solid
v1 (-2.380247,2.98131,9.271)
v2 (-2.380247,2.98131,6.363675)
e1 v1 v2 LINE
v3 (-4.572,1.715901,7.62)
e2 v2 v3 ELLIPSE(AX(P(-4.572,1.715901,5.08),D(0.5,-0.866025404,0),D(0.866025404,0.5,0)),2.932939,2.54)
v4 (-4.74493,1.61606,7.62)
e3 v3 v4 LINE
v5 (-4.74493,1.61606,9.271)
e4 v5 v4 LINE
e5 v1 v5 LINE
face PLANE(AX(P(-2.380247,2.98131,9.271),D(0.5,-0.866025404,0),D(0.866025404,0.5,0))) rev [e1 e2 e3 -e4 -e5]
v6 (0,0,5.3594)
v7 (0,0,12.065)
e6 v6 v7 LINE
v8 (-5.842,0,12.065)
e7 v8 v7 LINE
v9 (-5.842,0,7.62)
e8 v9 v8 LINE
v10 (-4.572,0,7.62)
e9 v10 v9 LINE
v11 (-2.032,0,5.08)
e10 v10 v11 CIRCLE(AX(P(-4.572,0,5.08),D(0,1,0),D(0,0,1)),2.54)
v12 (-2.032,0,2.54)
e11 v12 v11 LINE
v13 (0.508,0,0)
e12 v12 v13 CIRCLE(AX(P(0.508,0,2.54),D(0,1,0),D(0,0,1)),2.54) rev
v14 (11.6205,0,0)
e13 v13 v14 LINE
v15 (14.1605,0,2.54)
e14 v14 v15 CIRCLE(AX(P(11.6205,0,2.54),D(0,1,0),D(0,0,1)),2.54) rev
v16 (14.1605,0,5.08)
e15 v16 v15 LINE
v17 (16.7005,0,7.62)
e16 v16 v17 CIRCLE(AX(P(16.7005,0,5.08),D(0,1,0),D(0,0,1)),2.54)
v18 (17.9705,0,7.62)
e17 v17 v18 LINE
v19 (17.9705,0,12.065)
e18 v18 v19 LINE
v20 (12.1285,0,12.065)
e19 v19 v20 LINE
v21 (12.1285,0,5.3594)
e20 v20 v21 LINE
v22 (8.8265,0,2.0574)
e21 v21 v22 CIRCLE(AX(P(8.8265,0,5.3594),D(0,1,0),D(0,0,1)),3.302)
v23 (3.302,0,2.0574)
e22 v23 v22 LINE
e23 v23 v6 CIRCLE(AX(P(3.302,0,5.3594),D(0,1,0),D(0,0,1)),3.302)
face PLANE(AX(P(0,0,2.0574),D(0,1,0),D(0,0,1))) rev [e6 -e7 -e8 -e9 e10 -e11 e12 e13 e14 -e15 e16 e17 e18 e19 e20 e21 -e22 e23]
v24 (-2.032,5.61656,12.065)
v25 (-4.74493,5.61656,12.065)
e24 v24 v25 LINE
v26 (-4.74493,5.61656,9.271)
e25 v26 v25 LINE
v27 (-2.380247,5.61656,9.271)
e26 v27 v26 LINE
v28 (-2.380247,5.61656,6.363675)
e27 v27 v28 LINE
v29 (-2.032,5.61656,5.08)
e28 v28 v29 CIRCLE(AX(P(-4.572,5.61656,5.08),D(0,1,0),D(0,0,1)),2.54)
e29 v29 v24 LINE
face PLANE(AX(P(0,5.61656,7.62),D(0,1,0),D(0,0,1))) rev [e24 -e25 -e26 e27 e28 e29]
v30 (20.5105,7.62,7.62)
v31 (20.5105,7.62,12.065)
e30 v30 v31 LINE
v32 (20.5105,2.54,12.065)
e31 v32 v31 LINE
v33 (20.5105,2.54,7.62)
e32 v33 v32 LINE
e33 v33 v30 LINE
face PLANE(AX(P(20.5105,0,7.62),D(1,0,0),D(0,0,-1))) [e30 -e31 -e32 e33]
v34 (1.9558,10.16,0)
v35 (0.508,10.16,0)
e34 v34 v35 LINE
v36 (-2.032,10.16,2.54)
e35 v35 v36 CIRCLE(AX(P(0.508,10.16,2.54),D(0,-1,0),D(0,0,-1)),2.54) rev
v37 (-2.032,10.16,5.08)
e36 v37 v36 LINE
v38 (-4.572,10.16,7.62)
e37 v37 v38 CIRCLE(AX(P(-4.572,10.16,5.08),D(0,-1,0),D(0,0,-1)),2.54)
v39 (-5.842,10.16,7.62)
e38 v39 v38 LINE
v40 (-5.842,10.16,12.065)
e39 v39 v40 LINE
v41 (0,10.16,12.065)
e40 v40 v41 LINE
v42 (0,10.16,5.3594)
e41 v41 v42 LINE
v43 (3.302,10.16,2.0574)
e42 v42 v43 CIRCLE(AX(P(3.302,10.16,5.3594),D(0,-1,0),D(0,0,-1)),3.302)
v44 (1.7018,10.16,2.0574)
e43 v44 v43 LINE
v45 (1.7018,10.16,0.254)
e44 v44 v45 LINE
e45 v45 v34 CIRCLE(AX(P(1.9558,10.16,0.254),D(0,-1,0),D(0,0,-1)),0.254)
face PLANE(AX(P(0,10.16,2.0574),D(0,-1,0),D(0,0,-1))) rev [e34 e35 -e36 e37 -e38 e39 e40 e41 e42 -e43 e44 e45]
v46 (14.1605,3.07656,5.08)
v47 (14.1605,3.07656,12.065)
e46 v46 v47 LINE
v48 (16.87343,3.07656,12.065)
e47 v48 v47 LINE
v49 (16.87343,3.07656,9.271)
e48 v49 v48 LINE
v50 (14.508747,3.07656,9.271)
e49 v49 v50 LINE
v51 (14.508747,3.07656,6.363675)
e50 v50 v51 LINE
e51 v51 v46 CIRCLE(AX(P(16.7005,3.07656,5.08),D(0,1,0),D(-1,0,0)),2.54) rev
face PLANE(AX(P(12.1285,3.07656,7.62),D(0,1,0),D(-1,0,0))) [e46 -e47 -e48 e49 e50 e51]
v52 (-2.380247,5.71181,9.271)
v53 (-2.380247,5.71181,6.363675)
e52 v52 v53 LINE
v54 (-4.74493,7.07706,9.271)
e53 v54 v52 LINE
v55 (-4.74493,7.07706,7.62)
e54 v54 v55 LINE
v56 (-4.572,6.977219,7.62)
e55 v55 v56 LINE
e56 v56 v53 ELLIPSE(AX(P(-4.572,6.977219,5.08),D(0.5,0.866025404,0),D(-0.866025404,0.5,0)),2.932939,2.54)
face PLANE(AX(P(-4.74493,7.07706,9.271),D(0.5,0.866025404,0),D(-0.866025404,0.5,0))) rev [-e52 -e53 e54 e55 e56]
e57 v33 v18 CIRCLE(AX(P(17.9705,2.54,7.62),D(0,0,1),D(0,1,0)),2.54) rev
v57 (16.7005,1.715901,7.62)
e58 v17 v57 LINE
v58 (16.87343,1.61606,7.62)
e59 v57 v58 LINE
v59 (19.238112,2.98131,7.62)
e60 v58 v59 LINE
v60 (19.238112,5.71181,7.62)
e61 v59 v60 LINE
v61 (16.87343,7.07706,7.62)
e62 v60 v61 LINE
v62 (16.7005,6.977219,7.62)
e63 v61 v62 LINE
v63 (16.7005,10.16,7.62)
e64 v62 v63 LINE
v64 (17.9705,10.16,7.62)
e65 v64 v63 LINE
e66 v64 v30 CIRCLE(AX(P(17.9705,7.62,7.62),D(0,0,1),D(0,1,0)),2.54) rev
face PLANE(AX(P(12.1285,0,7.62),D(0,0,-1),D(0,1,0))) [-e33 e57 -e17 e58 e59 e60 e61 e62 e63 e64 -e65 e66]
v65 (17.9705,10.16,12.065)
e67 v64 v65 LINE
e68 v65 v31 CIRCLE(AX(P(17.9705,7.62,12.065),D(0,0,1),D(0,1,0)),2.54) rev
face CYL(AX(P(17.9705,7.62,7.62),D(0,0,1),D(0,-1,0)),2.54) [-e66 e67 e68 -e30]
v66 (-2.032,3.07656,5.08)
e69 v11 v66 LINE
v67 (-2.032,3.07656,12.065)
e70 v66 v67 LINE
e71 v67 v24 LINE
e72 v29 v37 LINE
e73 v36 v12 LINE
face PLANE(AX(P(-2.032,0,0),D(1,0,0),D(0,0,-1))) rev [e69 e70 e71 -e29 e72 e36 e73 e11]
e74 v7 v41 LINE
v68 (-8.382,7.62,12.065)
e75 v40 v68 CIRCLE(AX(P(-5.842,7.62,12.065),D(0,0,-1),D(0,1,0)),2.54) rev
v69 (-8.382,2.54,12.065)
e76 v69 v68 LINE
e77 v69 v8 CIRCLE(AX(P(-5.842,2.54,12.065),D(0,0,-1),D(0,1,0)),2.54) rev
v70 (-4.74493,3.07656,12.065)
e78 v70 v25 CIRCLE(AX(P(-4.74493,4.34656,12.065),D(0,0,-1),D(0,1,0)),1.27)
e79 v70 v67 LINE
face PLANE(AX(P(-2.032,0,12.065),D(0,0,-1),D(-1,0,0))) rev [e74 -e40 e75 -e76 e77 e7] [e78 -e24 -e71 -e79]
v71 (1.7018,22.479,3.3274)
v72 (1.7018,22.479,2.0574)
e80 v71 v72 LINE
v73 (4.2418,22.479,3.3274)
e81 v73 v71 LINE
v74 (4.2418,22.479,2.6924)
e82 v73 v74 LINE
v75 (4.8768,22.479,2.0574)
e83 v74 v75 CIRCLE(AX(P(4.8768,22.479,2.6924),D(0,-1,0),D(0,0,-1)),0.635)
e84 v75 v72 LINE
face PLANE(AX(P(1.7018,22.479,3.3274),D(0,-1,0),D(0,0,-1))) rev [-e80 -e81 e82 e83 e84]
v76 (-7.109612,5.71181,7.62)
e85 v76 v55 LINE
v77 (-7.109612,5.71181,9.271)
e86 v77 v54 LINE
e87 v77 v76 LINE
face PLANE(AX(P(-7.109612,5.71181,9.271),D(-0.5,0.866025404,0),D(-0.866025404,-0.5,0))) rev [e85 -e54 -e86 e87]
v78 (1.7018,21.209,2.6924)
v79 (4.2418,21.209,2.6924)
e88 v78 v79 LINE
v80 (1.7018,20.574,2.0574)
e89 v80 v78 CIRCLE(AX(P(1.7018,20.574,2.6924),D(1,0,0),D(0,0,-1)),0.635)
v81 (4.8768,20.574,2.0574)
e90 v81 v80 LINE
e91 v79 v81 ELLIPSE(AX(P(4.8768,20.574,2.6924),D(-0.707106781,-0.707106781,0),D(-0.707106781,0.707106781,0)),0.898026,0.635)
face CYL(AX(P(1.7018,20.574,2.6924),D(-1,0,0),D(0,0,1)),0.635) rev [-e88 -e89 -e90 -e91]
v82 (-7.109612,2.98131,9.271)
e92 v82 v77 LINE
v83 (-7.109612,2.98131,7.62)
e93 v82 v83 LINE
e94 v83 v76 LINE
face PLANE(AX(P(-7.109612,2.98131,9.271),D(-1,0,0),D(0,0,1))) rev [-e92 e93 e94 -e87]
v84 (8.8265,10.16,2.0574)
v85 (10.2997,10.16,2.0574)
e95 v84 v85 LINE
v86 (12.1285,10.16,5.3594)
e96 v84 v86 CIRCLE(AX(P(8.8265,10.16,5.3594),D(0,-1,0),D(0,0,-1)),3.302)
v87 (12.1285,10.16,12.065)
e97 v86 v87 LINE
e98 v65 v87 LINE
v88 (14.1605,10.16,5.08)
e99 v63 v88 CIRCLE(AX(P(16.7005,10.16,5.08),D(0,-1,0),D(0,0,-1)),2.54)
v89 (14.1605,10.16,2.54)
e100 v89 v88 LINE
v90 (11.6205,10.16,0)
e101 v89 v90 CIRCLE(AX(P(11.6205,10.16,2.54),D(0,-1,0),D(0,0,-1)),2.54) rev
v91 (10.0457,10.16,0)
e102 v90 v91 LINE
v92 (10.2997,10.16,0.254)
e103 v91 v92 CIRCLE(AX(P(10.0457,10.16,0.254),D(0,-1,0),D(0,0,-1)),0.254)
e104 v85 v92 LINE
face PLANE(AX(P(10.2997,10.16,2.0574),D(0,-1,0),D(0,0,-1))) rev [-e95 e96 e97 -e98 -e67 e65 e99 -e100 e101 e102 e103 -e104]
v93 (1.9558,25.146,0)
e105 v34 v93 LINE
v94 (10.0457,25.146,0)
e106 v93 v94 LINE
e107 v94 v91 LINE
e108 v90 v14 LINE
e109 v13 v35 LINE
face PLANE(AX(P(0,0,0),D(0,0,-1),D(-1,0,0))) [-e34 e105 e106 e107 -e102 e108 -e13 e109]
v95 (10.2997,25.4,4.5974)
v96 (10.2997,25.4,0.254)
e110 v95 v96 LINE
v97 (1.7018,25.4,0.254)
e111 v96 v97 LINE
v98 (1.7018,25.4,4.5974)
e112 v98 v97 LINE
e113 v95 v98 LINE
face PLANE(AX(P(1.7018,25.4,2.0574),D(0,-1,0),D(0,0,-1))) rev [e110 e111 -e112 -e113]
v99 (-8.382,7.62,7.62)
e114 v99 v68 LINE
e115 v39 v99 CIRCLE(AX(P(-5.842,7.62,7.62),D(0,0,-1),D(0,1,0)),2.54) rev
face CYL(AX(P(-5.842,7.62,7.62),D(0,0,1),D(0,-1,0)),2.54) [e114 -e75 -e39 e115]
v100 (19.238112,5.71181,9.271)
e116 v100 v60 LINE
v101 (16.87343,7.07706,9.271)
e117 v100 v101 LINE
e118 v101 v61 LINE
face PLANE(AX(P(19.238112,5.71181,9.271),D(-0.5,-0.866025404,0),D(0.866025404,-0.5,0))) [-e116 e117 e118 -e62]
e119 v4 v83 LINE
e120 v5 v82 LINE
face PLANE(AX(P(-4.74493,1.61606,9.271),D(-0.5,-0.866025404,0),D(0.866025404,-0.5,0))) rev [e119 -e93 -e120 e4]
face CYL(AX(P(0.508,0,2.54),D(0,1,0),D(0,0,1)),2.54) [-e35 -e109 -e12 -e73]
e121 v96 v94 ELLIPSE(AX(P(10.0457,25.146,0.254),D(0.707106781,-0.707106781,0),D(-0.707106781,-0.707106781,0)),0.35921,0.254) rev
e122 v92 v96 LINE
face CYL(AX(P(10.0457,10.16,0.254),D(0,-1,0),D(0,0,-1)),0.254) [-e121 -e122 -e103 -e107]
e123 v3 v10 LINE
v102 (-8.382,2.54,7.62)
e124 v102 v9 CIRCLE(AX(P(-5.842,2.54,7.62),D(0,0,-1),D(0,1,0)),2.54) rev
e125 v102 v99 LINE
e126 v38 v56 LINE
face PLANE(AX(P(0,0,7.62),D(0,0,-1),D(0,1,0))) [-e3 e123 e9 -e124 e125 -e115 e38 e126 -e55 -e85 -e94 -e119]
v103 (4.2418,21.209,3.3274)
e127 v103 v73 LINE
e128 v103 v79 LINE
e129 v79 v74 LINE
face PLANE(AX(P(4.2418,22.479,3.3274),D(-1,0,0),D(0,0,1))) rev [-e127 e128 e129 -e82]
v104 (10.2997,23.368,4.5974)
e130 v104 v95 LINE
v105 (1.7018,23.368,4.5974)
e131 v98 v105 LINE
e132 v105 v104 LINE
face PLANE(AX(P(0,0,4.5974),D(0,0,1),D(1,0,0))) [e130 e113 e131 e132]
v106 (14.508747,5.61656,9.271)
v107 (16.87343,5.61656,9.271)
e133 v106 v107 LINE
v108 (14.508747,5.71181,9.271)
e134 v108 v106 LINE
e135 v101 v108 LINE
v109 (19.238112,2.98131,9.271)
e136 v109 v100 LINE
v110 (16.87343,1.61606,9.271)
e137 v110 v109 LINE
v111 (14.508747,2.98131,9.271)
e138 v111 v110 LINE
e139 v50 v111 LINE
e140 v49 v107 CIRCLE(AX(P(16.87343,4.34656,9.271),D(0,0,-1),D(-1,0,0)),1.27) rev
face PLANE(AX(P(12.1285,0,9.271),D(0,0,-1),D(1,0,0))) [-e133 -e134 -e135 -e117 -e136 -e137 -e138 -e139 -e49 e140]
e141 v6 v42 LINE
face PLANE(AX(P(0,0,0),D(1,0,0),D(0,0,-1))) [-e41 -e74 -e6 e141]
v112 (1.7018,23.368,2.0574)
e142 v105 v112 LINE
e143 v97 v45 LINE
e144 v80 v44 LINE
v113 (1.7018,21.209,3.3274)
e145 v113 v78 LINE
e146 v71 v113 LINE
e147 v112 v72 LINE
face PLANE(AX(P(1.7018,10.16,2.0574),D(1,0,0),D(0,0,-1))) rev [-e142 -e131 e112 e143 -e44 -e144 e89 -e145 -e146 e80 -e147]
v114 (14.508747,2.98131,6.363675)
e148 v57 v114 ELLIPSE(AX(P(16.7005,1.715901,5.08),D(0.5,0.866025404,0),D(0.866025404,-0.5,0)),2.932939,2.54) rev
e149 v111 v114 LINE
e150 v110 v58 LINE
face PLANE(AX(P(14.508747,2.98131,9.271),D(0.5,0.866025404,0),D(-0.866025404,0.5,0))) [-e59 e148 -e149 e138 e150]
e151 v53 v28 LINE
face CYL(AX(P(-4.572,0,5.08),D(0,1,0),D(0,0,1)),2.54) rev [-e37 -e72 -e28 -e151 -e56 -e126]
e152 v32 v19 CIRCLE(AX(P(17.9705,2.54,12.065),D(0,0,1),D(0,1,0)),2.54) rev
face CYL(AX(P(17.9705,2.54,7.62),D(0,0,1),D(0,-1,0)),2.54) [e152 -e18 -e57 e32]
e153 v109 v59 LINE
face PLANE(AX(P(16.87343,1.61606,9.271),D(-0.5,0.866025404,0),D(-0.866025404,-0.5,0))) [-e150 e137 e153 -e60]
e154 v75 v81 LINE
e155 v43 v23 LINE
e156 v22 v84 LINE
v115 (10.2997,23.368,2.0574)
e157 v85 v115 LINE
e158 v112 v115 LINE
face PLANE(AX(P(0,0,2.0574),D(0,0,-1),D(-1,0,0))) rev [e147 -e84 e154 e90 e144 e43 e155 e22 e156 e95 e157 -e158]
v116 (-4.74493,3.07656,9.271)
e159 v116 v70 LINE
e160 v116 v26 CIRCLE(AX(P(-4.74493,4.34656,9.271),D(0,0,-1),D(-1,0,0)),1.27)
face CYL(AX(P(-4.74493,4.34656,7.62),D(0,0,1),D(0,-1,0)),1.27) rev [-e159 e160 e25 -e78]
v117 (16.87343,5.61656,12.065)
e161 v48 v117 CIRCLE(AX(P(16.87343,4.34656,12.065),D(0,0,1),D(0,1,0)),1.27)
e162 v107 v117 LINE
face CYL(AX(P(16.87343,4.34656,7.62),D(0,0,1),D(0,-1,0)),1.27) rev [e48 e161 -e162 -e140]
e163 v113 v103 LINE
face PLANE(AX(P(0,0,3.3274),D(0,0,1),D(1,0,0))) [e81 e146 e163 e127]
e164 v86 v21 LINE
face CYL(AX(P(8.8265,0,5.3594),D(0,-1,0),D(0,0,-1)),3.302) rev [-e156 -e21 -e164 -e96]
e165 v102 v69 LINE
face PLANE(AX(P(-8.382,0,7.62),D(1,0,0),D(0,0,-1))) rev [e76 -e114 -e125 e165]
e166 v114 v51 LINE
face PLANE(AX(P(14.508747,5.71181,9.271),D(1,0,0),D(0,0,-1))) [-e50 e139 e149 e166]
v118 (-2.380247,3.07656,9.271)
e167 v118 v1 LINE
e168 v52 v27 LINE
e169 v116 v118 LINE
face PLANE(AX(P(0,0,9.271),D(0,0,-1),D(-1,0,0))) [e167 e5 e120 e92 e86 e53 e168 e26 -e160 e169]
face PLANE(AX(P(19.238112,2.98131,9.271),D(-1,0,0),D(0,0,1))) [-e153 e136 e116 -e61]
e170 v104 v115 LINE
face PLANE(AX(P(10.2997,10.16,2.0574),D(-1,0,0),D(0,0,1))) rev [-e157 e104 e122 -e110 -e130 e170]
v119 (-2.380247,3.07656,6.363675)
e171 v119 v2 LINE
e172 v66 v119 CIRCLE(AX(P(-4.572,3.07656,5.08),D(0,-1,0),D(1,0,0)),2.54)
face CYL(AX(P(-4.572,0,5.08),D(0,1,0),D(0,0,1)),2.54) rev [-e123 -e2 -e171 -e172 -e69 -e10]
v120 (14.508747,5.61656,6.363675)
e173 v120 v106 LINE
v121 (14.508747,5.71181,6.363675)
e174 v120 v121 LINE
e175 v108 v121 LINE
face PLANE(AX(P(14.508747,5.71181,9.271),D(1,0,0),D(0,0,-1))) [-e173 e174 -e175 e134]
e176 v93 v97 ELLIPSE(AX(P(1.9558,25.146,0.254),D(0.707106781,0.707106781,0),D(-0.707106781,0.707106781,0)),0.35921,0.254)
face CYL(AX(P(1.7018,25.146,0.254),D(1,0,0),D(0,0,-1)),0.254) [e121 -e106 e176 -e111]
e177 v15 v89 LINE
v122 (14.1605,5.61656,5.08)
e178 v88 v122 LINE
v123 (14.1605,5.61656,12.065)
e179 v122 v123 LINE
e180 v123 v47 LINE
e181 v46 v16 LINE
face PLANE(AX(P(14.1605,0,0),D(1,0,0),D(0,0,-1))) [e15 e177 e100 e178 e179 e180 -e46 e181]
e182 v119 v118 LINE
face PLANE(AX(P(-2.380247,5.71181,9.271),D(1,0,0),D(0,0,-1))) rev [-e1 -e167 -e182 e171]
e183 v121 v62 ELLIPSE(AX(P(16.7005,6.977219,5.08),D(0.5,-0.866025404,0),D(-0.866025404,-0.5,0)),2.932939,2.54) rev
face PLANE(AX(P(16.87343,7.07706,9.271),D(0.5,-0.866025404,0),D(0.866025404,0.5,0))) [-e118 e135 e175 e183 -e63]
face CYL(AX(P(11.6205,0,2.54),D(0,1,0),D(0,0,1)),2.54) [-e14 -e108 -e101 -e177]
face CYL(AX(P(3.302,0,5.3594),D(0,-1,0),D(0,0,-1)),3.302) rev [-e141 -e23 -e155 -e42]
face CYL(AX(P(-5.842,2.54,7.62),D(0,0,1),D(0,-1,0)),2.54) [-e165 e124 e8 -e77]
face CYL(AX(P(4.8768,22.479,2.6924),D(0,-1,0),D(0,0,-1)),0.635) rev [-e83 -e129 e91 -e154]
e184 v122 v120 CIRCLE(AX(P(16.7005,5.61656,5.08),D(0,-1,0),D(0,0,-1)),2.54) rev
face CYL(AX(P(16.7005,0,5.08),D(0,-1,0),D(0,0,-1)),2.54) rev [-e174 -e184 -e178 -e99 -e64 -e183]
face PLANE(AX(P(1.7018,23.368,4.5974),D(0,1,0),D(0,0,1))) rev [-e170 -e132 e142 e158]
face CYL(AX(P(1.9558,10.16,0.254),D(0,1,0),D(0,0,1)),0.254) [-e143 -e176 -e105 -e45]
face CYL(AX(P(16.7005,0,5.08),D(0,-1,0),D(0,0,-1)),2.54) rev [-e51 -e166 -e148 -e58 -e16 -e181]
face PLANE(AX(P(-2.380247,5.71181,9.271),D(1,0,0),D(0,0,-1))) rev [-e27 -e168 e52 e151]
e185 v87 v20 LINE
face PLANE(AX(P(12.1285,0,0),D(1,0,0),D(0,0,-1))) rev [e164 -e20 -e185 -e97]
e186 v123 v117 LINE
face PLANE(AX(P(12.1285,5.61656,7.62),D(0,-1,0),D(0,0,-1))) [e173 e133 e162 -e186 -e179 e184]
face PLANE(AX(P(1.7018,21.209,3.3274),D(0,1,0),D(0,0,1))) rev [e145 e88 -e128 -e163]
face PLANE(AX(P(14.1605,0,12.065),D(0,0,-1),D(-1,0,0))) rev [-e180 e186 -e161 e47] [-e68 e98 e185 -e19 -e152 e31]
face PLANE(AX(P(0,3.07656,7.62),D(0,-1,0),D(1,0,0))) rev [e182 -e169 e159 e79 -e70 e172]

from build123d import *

# Parameters (mm, degrees)
BOSS_EXTRUDE1_DEPTH = 2.0574
SKETCH4_W           = 12.065
SKETCH4_H           = 10.16
BOSS_EXTRUDE2_DEPTH = 2.032
SKETCH5_W           = 12.065
SKETCH5_H           = 10.16
BOSS_EXTRUDE3_DEPTH = 2.032
SKETCH8_W           = 8.5979
SKETCH8_H           = 2.032
BOSS_EXTRUDE4_DEPTH = 2.54
FILLET22_R          = 3.302
CUT_EXTRUDE12_DEPTH = 13.208
SKETCH28_W          = 2.54
SKETCH28_H          = 1.27
BOSS_EXTRUDE6_DEPTH = 1.27
BOSS_EXTRUDE7_DEPTH = 4.445
FILLET23_R          = 0.635
CUT_EXTRUDE15_DEPTH = 1.651
FILLET25_R          = 0.254
FILLET26_R          = 2.54


with BuildPart() as part:
    # Sketch1 → Boss-Extrude1 (new body)
    with BuildSketch(Plane.XY):
        Polygon((0, 0), (12.1285, 0), (12.1285, 10.16), (10.2997, 10.16), (10.2997, 25.4), (1.7018, 25.4), (1.7018, 10.16), (0, 10.16), align=None)
    extrude(amount=BOSS_EXTRUDE1_DEPTH)

    # Sketch4 → Boss-Extrude2 (add)
    with BuildSketch(Plane(origin=(12.1285, 0, 0), x_dir=(0, 0, -1), z_dir=(1, 0, 0))):
        with Locations((-6.0325, 5.08)):
            Rectangle(SKETCH4_W, SKETCH4_H)
    extrude(amount=BOSS_EXTRUDE2_DEPTH)

    # Sketch5 → Boss-Extrude3 (add)
    with BuildSketch(Plane.ZY):
        with Locations((6.0325, 5.08)):
            Rectangle(SKETCH5_W, SKETCH5_H)
    extrude(amount=BOSS_EXTRUDE3_DEPTH)

    # Sketch8 → Boss-Extrude4 (add)
    with BuildSketch(Plane.XY.offset(2.0574)):
        with Locations((6.00075, 24.384)):
            Rectangle(SKETCH8_W, SKETCH8_H)
    extrude(amount=BOSS_EXTRUDE4_DEPTH)

    # Fillet22
    fillet22_edges = [part.edges().sort_by_distance(p)[0] for p in [
        (12.1285, 5.08, 2.0574),
        (0, 5.08, 2.0574),
    ]]
    fillet(fillet22_edges, radius=FILLET22_R)

    # Sketch26 → Cut-Extrude12 (cut)
    with BuildSketch(Plane.XZ.offset(-23.368)):
        Polygon((8.382, 4.5974), (1.7018, 4.5974), (1.620324679, 2.0574), (10.2997, 2.0574), (10.2997, 4.5974), align=None)
    extrude(amount=CUT_EXTRUDE12_DEPTH, mode=Mode.SUBTRACT)

    # Sketch28 → Boss-Extrude6 (add)
    with BuildSketch(Plane.XY.offset(2.0574)):
        with Locations((2.9718, 21.844)):
            Rectangle(SKETCH28_W, SKETCH28_H)
    extrude(amount=BOSS_EXTRUDE6_DEPTH)

    # Sketch30 → Boss-Extrude7 (add)
    with BuildSketch(Plane(origin=(0, 0, 12.065), x_dir=(-1, 0, 0), z_dir=(0, 0, -1))):
        with BuildLine():
            Line((2.032, 3.076559617), (2.032, 0))
            Line((2.032, 0), (5.842, 0))
            ThreePointArc((5.842, 0), (7.638051224, 0.743948776), (8.382, 2.54))
            Line((8.382, 2.54), (8.382, 7.62))
            ThreePointArc((8.382, 7.62), (7.638051224, 9.416051224), (5.842, 10.16))
            Line((5.842, 10.16), (2.032, 10.16))
            Line((2.032, 10.16), (2.032, 5.616559617))
            Line((2.032, 5.616559617), (4.744929833, 5.616559617))
            ThreePointArc((4.744929833, 5.616559617), (6.014929833, 4.346559617), (4.744929833, 3.076559617))
            Line((4.744929833, 3.076559617), (2.032, 3.076559617))
        make_face()
    boss_extrude7 = extrude(amount=BOSS_EXTRUDE7_DEPTH)

    # Fillet23
    fillet23_edges = [part.edges().sort_by_distance(p)[0] for p in [
        (2.9718, 21.209, 2.0574),
        (4.2418, 21.844, 2.0574),
    ]]
    fillet(fillet23_edges, radius=FILLET23_R)

    # Sketch34 → Cut-Extrude15 (cut)
    with BuildSketch(Plane(origin=(0, 0, 7.62), x_dir=(-1, 0, 0), z_dir=(0, 0, -1))):
        Polygon((4.744929833, 7.077059617), (2.380247468, 5.711809617), (2.380247468, 2.981309617), (4.744929833, 1.616059617), (7.109612198, 2.981309617), (7.109612198, 5.711809617), align=None)
    cut_extrude15 = extrude(amount=-CUT_EXTRUDE15_DEPTH, mode=Mode.SUBTRACT)

    # Fillet25
    fillet25_edges = [part.edges().sort_by_distance(p)[0] for p in [
        (1.7018, 17.78, 0),
        (6.00075, 25.4, 0),
        (10.2997, 17.78, 0),
    ]]
    fillet(fillet25_edges, radius=FILLET25_R)

    # Mirror7: Boss-Extrude7, Cut-Extrude15 across plane
    add(boss_extrude7.mirror(Plane(origin=(6.06425, 0, 0), x_dir=(0, 0, 1), z_dir=(1, 0, 0))))
    add(cut_extrude15.mirror(Plane(origin=(6.06425, 0, 0), x_dir=(0, 0, 1), z_dir=(1, 0, 0))), mode=Mode.SUBTRACT)

    # Fillet26
    # the kernel refuses this fillet: 2.54 mm, written as the material it adds along each edge
    with BuildSketch(Plane(origin=(-2.032, 9.426559617, 7.62), x_dir=(-1, 0, 0), z_dir=(0, -1, 0))) as fillet26_piece_1_section:
        with BuildLine():
            CenterArc((FILLET26_R, FILLET26_R), FILLET26_R, 180, 90)
            Line((0, FILLET26_R), (0, 0))
            Line((0, 0), (FILLET26_R, 0))
        make_face()
    fillet26_piece_1 = extrude(amount=15.776559617, mode=Mode.PRIVATE)
    fillet26_piece_1 = split(fillet26_piece_1, bisect_by=Plane(origin=(-2.868298698, 5.616559617, 7.255726229), z_dir=(0, 1, 0)), keep=Keep.TOP, mode=Mode.PRIVATE)
    fillet26_piece_1 = split(fillet26_piece_1, bisect_by=Plane(origin=(-3.61155926, 6.422707812, 7.255726229), z_dir=(0.5000000000000006, 0.8660254037844384, 0)), keep=Keep.TOP, mode=Mode.PRIVATE)
    add(fillet26_piece_1)
    with BuildSketch(Plane(origin=(-2.032, 9.426559617, 7.62), x_dir=(-1, 0, 0), z_dir=(0, -1, 0))) as fillet26_piece_2_section:
        with BuildLine():
            CenterArc((FILLET26_R, FILLET26_R), FILLET26_R, 180, 90)
            Line((0, FILLET26_R), (0, 0))
            Line((0, 0), (FILLET26_R, 0))
        make_face()
    fillet26_piece_2 = extrude(amount=15.776559617, mode=Mode.PRIVATE)
    fillet26_piece_2 = split(fillet26_piece_2, bisect_by=Plane(origin=(-2.323081937, 5.616559617, 6.938732997), z_dir=(0, 1, 0)), keep=Keep.TOP, mode=Mode.PRIVATE)
    fillet26_piece_2 = split(fillet26_piece_2, bisect_by=Plane(origin=(-2.380247468, 5.647682341, 6.938732997), z_dir=(1, 0, 0)), keep=Keep.TOP, mode=Mode.PRIVATE)
    add(fillet26_piece_2)
    with BuildSketch(Plane(origin=(-2.032, 3.076559617, 7.62), x_dir=(-1, 0, 0), z_dir=(0, -1, 0))) as fillet26_piece_3_section:
        with BuildLine():
            CenterArc((FILLET26_R, FILLET26_R), FILLET26_R, 180, 90)
            Line((0, FILLET26_R), (0, 0))
            Line((0, 0), (FILLET26_R, 0))
        make_face()
    fillet26_piece_3 = extrude(amount=3.076559617, mode=Mode.PRIVATE)
    fillet26_piece_3 = split(fillet26_piece_3, bisect_by=Plane(origin=(-2.380247468, 3.045436894, 6.938732997), z_dir=(1, 0, 0)), keep=Keep.TOP, mode=Mode.PRIVATE)
    add(fillet26_piece_3)
    with BuildSketch(Plane(origin=(-2.032, 9.426559617, 7.62), x_dir=(-1, 0, 0), z_dir=(0, -1, 0))) as fillet26_piece_4_section:
        with BuildLine():
            CenterArc((FILLET26_R, FILLET26_R), FILLET26_R, 180, 90)
            Line((0, FILLET26_R), (0, 0))
            Line((0, 0), (FILLET26_R, 0))
        make_face()
    fillet26_piece_4 = extrude(amount=9.426559617, mode=Mode.PRIVATE)
    fillet26_piece_4 = split(fillet26_piece_4, bisect_by=Plane(origin=(-2.380247468, 1.352070174, 7.252623905), z_dir=(-1, 0, 0)), keep=Keep.TOP, mode=Mode.PRIVATE)
    fillet26_piece_4 = split(fillet26_piece_4, bisect_by=Plane(origin=(-3.445782292, 2.3661228, 7.252623905), z_dir=(0.5000000000000002, -0.8660254037844386, 0)), keep=Keep.TOP, mode=Mode.PRIVATE)
    add(fillet26_piece_4)
    with BuildSketch(Plane(origin=(-2.032, 10.16, 7.62), x_dir=(-1, 0, 0), z_dir=(0, -1, 0))) as fillet26_piece_5_section:
        with BuildLine():
            CenterArc((FILLET26_R, FILLET26_R), FILLET26_R, 180, 90)
            Line((0, FILLET26_R), (0, 0))
            Line((0, 0), (FILLET26_R, 0))
        make_face()
    fillet26_piece_5 = extrude(amount=4.543440383, mode=Mode.PRIVATE)
    fillet26_piece_5 = split(fillet26_piece_5, bisect_by=Plane(origin=(-3.774867909, 6.516994104, 7.257731874), z_dir=(0.5000000000000006, 0.8660254037844384, 0)), keep=Keep.TOP, mode=Mode.PRIVATE)
    add(fillet26_piece_5)
    with BuildSketch(Plane(origin=(-2.032, 16.51, 7.62), x_dir=(-1, 0, 0), z_dir=(0, -1, 0))) as fillet26_piece_6_section:
        with BuildLine():
            CenterArc((FILLET26_R, FILLET26_R), FILLET26_R, 180, 90)
            Line((0, FILLET26_R), (0, 0))
            Line((0, 0), (FILLET26_R, 0))
        make_face()
    fillet26_piece_6 = extrude(amount=10.893440383, mode=Mode.PRIVATE)
    fillet26_piece_6 = split(fillet26_piece_6, bisect_by=Plane(origin=(-2.380247468, 5.647682341, 6.938732997), z_dir=(1, 0, 0)), keep=Keep.TOP, mode=Mode.PRIVATE)
    fillet26_piece_6 = split(fillet26_piece_6, bisect_by=Plane(origin=(-2.309605395, 5.671024397, 6.938732997), z_dir=(-0.5000000000000006, -0.8660254037844384, 0)), keep=Keep.TOP, mode=Mode.PRIVATE)
    add(fillet26_piece_6)
    with BuildSketch(Plane(origin=(-2.032, 16.51, 7.62), x_dir=(-1, 0, 0), z_dir=(0, -1, 0))) as fillet26_piece_7_section:
        with BuildLine():
            CenterArc((FILLET26_R, FILLET26_R), FILLET26_R, 180, 90)
            Line((0, FILLET26_R), (0, 0))
            Line((0, 0), (FILLET26_R, 0))
        make_face()
    fillet26_piece_7 = extrude(amount=17.243440383, mode=Mode.PRIVATE)
    fillet26_piece_7 = split(fillet26_piece_7, bisect_by=Plane(origin=(-2.323081937, 0, 6.938732997), z_dir=(0, 1, 0)), keep=Keep.TOP, mode=Mode.PRIVATE)
    fillet26_piece_7 = split(fillet26_piece_7, bisect_by=Plane(origin=(-2.323081937, 3.076559617, 6.938732997), z_dir=(0, -1, 0)), keep=Keep.TOP, mode=Mode.PRIVATE)
    fillet26_piece_7 = split(fillet26_piece_7, bisect_by=Plane(origin=(-2.380247468, 3.045436894, 6.938732997), z_dir=(1, 0, 0)), keep=Keep.TOP, mode=Mode.PRIVATE)
    add(fillet26_piece_7)
    with BuildSketch(Plane(origin=(-2.032, 16.51, 7.62), x_dir=(-1, 0, 0), z_dir=(0, -1, 0))) as fillet26_piece_8_section:
        with BuildLine():
            CenterArc((FILLET26_R, FILLET26_R), FILLET26_R, 180, 90)
            Line((0, FILLET26_R), (0, 0))
            Line((0, 0), (FILLET26_R, 0))
        make_face()
    fillet26_piece_8 = extrude(amount=17.243440383, mode=Mode.PRIVATE)
    fillet26_piece_8 = split(fillet26_piece_8, bisect_by=Plane(origin=(-2.860318736, 0, 7.252623905), z_dir=(0, 1, 0)), keep=Keep.TOP, mode=Mode.PRIVATE)
    fillet26_piece_8 = split(fillet26_piece_8, bisect_by=Plane(origin=(-2.380247468, 1.352070174, 7.252623905), z_dir=(-1, 0, 0)), keep=Keep.TOP, mode=Mode.PRIVATE)
    fillet26_piece_8 = split(fillet26_piece_8, bisect_by=Plane(origin=(-3.445782292, 2.3661228, 7.252623905), z_dir=(0.5000000000000002, -0.8660254037844386, 0)), keep=Keep.TOP, mode=Mode.PRIVATE)
    add(fillet26_piece_8)
    with BuildSketch(Plane(origin=(14.1605, 9.426559617, 7.62), x_dir=(0, 0, -1), z_dir=(0, -1, 0))) as fillet26_piece_9_section:
        with BuildLine():
            CenterArc((FILLET26_R, FILLET26_R), FILLET26_R, 180, 90)
            Line((0, FILLET26_R), (0, 0))
            Line((0, 0), (FILLET26_R, 0))
        make_face()
    fillet26_piece_9 = extrude(amount=15.776559617, mode=Mode.PRIVATE)
    fillet26_piece_9 = split(fillet26_piece_9, bisect_by=Plane(origin=(14.316328874, 5.616559617, 6.756250479), z_dir=(0, 1, 0)), keep=Keep.TOP, mode=Mode.PRIVATE)
    fillet26_piece_9 = split(fillet26_piece_9, bisect_by=Plane(origin=(14.508747468, 7.530619089, 6.756250479), z_dir=(-1, 0, 0)), keep=Keep.TOP, mode=Mode.PRIVATE)
    add(fillet26_piece_9)
    with BuildSketch(Plane(origin=(14.1605, 9.426559617, 7.62), x_dir=(0, 0, -1), z_dir=(0, -1, 0))) as fillet26_piece_10_section:
        with BuildLine():
            CenterArc((FILLET26_R, FILLET26_R), FILLET26_R, 180, 90)
            Line((0, FILLET26_R), (0, 0))
            Line((0, 0), (FILLET26_R, 0))
        make_face()
    fillet26_piece_10 = extrude(amount=15.776559617, mode=Mode.PRIVATE)
    fillet26_piece_10 = split(fillet26_piece_10, bisect_by=Plane(origin=(14.508747468, 7.710072871, 7.255726229), z_dir=(1, 0, 0)), keep=Keep.TOP, mode=Mode.PRIVATE)
    fillet26_piece_10 = split(fillet26_piece_10, bisect_by=Plane(origin=(15.740059261, 6.422707812, 7.255726229), z_dir=(-0.5000000000000006, 0.8660254037844384, 0)), keep=Keep.TOP, mode=Mode.PRIVATE)
    add(fillet26_piece_10)
    with BuildSketch(Plane(origin=(14.1605, 3.076559617, 7.62), x_dir=(0, 0, -1), z_dir=(0, -1, 0))) as fillet26_piece_11_section:
        with BuildLine():
            CenterArc((FILLET26_R, FILLET26_R), FILLET26_R, 180, 90)
            Line((0, FILLET26_R), (0, 0))
            Line((0, 0), (FILLET26_R, 0))
        make_face()
    fillet26_piece_11 = extrude(amount=3.076559617, mode=Mode.PRIVATE)
    fillet26_piece_11 = split(fillet26_piece_11, bisect_by=Plane(origin=(14.508747468, 3.04543688, 6.938733061), z_dir=(-1, 0, 0)), keep=Keep.TOP, mode=Mode.PRIVATE)
    add(fillet26_piece_11)
    with BuildSketch(Plane(origin=(14.1605, 9.426559617, 7.62), x_dir=(0, 0, -1), z_dir=(0, -1, 0))) as fillet26_piece_12_section:
        with BuildLine():
            CenterArc((FILLET26_R, FILLET26_R), FILLET26_R, 180, 90)
            Line((0, FILLET26_R), (0, 0))
            Line((0, 0), (FILLET26_R, 0))
        make_face()
    fillet26_piece_12 = extrude(amount=9.426559617, mode=Mode.PRIVATE)
    fillet26_piece_12 = split(fillet26_piece_12, bisect_by=Plane(origin=(14.508747468, 1.352070172, 7.252623905), z_dir=(1, 0, 0)), keep=Keep.TOP, mode=Mode.PRIVATE)
    fillet26_piece_12 = split(fillet26_piece_12, bisect_by=Plane(origin=(15.574282292, 2.3661228, 7.252623905), z_dir=(-0.5000000000000002, -0.8660254037844386, 0)), keep=Keep.TOP, mode=Mode.PRIVATE)
    add(fillet26_piece_12)
    with BuildSketch(Plane(origin=(14.1605, 10.16, 7.62), x_dir=(0, 0, -1), z_dir=(0, -1, 0))) as fillet26_piece_13_section:
        with BuildLine():
            CenterArc((FILLET26_R, FILLET26_R), FILLET26_R, 180, 90)
            Line((0, FILLET26_R), (0, 0))
            Line((0, 0), (FILLET26_R, 0))
        make_face()
    fillet26_piece_13 = extrude(amount=4.543440383, mode=Mode.PRIVATE)
    fillet26_piece_13 = split(fillet26_piece_13, bisect_by=Plane(origin=(14.508747468, 7.897356486, 6.756392786), z_dir=(-1, 0, 0)), keep=Keep.TOP, mode=Mode.PRIVATE)
    add(fillet26_piece_13)
    with BuildSketch(Plane(origin=(14.1605, 10.16, 7.62), x_dir=(0, 0, -1), z_dir=(0, -1, 0))) as fillet26_piece_14_section:
        with BuildLine():
            CenterArc((FILLET26_R, FILLET26_R), FILLET26_R, 180, 90)
            Line((0, FILLET26_R), (0, 0))
            Line((0, 0), (FILLET26_R, 0))
        make_face()
    fillet26_piece_14 = extrude(amount=10.893440383, mode=Mode.PRIVATE)
    fillet26_piece_14 = split(fillet26_piece_14, bisect_by=Plane(origin=(14.508747468, 8.078282345, 7.257731874), z_dir=(1, 0, 0)), keep=Keep.TOP, mode=Mode.PRIVATE)
    fillet26_piece_14 = split(fillet26_piece_14, bisect_by=Plane(origin=(15.903367909, 6.516994104, 7.257731874), z_dir=(-0.5000000000000006, 0.8660254037844384, 0)), keep=Keep.TOP, mode=Mode.PRIVATE)
    add(fillet26_piece_14)
    with BuildSketch(Plane(origin=(14.1605, 16.51, 7.62), x_dir=(0, 0, -1), z_dir=(0, -1, 0))) as fillet26_piece_15_section:
        with BuildLine():
            CenterArc((FILLET26_R, FILLET26_R), FILLET26_R, 180, 90)
            Line((0, FILLET26_R), (0, 0))
            Line((0, 0), (FILLET26_R, 0))
        make_face()
    fillet26_piece_15 = extrude(amount=17.243440383, mode=Mode.PRIVATE)
    fillet26_piece_15 = split(fillet26_piece_15, bisect_by=Plane(origin=(14.451581939, 0, 6.938733061), z_dir=(0, 1, 0)), keep=Keep.TOP, mode=Mode.PRIVATE)
    fillet26_piece_15 = split(fillet26_piece_15, bisect_by=Plane(origin=(14.451581939, 3.076559617, 6.938733061), z_dir=(0, -1, 0)), keep=Keep.TOP, mode=Mode.PRIVATE)
    fillet26_piece_15 = split(fillet26_piece_15, bisect_by=Plane(origin=(14.508747468, 3.04543688, 6.938733061), z_dir=(-1, 0, 0)), keep=Keep.TOP, mode=Mode.PRIVATE)
    add(fillet26_piece_15)
    with BuildSketch(Plane(origin=(14.1605, 16.51, 7.62), x_dir=(0, 0, -1), z_dir=(0, -1, 0))) as fillet26_piece_16_section:
        with BuildLine():
            CenterArc((FILLET26_R, FILLET26_R), FILLET26_R, 180, 90)
            Line((0, FILLET26_R), (0, 0))
            Line((0, 0), (FILLET26_R, 0))
        make_face()
    fillet26_piece_16 = extrude(amount=17.243440383, mode=Mode.PRIVATE)
    fillet26_piece_16 = split(fillet26_piece_16, bisect_by=Plane(origin=(14.988818735, 0, 7.252623905), z_dir=(0, 1, 0)), keep=Keep.TOP, mode=Mode.PRIVATE)
    fillet26_piece_16 = split(fillet26_piece_16, bisect_by=Plane(origin=(14.508747468, 1.352070172, 7.252623905), z_dir=(1, 0, 0)), keep=Keep.TOP, mode=Mode.PRIVATE)
    fillet26_piece_16 = split(fillet26_piece_16, bisect_by=Plane(origin=(15.574282292, 2.3661228, 7.252623905), z_dir=(-0.5000000000000002, -0.8660254037844386, 0)), keep=Keep.TOP, mode=Mode.PRIVATE)
    add(fillet26_piece_16)
    # the kernel refuses this fillet: 2.54 mm, written as the material it takes off along each edge
    with BuildSketch(Plane(origin=(-2.032, 16.51, 0), x_dir=(1, 0, 0), z_dir=(0, -1, 0))) as fillet26_2_piece_1:
        with BuildLine():
            CenterArc((FILLET26_R, FILLET26_R), FILLET26_R, 180, 90)
            Line((0, FILLET26_R), (0, 0))
            Line((0, 0), (FILLET26_R, 0))
        make_face()
    extrude(amount=22.86, mode=Mode.SUBTRACT)
    with BuildSketch(Plane(origin=(14.1605, 16.51, 0), x_dir=(-1, 0, 0), z_dir=(0, -1, 0))) as fillet26_2_piece_2:
        with BuildLine():
            CenterArc((FILLET26_R, -FILLET26_R), FILLET26_R, 90, 90)
            Line((0, -FILLET26_R), (0, 0))
            Line((0, 0), (FILLET26_R, 0))
        make_face()
    extrude(amount=22.86, mode=Mode.SUBTRACT)


solid = part.part
